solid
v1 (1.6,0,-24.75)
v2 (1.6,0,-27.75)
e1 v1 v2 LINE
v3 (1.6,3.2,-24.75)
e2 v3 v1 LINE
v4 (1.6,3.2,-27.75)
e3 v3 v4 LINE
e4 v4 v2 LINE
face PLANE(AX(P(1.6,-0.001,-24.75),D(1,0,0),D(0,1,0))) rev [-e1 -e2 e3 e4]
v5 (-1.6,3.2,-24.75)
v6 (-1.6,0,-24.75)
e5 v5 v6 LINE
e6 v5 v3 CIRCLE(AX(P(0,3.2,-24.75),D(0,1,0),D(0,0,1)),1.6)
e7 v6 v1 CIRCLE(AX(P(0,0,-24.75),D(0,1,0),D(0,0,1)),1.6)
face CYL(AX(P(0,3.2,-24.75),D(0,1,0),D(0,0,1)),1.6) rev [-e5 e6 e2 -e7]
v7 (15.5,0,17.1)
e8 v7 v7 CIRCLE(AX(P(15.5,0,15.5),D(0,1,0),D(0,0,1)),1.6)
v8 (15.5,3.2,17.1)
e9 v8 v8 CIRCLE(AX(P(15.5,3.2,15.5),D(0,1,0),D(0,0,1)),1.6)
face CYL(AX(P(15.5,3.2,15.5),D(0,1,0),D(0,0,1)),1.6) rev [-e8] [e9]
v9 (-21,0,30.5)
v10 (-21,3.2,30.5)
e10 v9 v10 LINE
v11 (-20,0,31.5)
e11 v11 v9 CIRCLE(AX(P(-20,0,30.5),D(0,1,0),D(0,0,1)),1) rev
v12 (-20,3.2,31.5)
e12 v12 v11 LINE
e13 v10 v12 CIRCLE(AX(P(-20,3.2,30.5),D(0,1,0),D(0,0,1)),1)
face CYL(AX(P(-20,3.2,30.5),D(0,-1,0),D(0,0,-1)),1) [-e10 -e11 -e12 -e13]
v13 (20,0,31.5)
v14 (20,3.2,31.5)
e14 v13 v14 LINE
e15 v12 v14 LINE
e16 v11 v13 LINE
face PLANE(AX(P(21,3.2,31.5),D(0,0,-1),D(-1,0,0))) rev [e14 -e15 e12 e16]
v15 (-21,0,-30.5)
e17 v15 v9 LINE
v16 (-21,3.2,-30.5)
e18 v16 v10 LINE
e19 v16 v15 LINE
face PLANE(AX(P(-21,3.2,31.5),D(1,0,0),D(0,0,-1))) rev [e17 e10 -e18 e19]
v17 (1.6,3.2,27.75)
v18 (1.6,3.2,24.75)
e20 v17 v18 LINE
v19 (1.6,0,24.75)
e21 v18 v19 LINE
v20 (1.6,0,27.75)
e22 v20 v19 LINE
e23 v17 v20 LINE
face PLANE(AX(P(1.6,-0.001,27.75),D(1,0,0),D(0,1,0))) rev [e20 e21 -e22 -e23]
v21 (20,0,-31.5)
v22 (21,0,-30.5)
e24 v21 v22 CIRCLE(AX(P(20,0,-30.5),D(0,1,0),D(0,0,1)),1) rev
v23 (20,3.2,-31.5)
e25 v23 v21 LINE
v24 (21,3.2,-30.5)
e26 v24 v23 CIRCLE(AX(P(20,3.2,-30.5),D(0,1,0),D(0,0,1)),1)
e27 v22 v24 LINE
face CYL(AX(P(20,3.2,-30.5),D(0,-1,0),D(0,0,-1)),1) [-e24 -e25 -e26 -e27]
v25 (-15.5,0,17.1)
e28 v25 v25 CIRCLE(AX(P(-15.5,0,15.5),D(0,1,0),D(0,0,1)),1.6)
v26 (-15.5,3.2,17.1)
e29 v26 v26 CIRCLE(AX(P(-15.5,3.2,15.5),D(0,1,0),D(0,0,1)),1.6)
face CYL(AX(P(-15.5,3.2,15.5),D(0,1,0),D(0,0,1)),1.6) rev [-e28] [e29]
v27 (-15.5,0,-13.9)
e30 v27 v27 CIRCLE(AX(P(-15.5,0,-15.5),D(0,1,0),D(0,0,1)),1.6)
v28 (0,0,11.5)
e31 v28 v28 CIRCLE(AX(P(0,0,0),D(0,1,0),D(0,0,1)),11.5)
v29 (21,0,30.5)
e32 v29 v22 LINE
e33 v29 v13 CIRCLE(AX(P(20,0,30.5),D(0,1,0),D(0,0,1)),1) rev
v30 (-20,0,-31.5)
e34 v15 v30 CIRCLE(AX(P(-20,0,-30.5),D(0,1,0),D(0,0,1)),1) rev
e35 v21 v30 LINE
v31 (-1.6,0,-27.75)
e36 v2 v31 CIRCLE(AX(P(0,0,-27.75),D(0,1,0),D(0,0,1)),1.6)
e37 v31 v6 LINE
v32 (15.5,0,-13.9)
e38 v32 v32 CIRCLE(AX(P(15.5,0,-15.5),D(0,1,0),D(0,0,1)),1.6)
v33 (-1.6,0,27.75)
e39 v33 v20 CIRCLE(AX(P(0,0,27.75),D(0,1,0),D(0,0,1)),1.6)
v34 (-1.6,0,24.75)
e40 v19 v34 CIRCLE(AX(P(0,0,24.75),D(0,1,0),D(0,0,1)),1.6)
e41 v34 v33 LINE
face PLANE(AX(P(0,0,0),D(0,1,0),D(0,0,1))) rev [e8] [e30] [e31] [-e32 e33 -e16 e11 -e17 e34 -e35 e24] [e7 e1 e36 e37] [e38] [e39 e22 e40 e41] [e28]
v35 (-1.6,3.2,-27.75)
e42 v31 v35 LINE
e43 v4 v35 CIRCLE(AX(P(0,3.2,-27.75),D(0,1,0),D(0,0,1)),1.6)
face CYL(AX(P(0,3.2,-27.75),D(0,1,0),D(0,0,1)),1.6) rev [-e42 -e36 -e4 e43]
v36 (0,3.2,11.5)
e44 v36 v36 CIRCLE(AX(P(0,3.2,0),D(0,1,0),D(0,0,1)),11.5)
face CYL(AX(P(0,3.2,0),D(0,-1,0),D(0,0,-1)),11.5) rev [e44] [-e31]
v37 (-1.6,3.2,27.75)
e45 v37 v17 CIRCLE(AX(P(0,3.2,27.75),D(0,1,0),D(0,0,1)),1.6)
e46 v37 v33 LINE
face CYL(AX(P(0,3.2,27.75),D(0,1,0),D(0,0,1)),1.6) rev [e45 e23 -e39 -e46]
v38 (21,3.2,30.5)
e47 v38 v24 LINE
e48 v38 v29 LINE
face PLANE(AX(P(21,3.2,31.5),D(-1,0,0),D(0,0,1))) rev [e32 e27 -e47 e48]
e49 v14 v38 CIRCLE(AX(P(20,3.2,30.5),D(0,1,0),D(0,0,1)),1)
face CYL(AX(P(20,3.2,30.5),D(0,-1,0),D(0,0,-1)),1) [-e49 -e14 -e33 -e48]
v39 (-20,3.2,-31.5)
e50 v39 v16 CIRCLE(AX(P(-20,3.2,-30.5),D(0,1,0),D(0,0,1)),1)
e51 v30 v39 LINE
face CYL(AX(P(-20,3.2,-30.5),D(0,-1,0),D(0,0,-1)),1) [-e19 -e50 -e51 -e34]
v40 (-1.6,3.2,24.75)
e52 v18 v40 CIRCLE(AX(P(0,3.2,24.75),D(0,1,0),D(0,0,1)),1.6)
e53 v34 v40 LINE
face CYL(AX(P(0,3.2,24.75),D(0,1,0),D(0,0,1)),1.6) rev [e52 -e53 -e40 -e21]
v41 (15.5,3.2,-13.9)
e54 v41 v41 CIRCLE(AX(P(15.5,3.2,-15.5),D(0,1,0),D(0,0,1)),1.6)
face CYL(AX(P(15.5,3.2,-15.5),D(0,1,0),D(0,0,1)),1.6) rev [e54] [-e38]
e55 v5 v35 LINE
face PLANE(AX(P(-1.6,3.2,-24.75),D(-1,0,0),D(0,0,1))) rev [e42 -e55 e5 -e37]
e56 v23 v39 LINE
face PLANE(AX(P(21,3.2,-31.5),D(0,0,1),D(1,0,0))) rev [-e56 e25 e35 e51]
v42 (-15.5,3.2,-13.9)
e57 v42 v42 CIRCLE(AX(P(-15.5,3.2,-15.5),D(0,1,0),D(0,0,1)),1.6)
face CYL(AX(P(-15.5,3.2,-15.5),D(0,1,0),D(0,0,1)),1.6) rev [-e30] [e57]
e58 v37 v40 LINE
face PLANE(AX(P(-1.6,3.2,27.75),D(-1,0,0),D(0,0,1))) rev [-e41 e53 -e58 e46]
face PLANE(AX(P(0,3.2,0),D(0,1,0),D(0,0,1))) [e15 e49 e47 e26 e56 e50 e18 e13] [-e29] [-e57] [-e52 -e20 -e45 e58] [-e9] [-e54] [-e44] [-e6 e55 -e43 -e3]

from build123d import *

# Parameters (mm, degrees)
SKETCH1_W                = 42
SKETCH1_H                = 63
SKETCH1_R                = 11.5
BOSS_EXTRUDE1_DEPTH      = 3.2
M3_CLEARANCE_HOLE1_D     = 3.2
M3_CLEARANCE_SLOT1_DEPTH = 3.2
FILLET1_R                = 1


# Read off the part's stored shape, not the designer's step: M3 Clearance Slot1
with BuildPart() as part:
    # Sketch1 → Boss-Extrude1 (new body)
    with BuildSketch(Plane(origin=(0, 0, 0), x_dir=(1, 0, 0), z_dir=(0, 1, 0))):
        Rectangle(SKETCH1_W, SKETCH1_H)
        with Locations(Location((0, 0, 0), (0, 0, 270))):
            Circle(SKETCH1_R, mode=Mode.SUBTRACT)
    extrude(amount=BOSS_EXTRUDE1_DEPTH)

    # M3 Clearance Hole1 (through all)
    with Locations(Plane(origin=(0, 3.2, 0), x_dir=(1, 0, 0), z_dir=(0, 1, 0))):
        with Locations((-15.5, 15.5), (15.5, 15.5), (15.5, -15.5), (-15.5, -15.5)):
            Hole(M3_CLEARANCE_HOLE1_D / 2)

    # M3 Clearance Slot1 outline → M3 Clearance Slot1 (cut)
    with BuildSketch(Plane(origin=(0, 0, 0), x_dir=(1, 0, 0), z_dir=(0, 1, 0))):
        with BuildLine():
            Line((1.6, -27.75), (1.6, -24.75))
            ThreePointArc((1.6, -24.75), (0, -23.15), (-1.6, -24.75))
            Line((-1.6, -24.75), (-1.6, -27.75))
            ThreePointArc((-1.6, -27.75), (0, -29.35), (1.6, -27.75))
        make_face()
        with BuildLine():
            ThreePointArc((1.6, 27.75), (0, 29.35), (-1.6, 27.75))
            Line((-1.6, 27.75), (-1.6, 24.75))
            ThreePointArc((-1.6, 24.75), (0, 23.15), (1.6, 24.75))
            Line((1.6, 24.75), (1.6, 27.75))
        make_face()
    extrude(amount=M3_CLEARANCE_SLOT1_DEPTH, mode=Mode.SUBTRACT)

    # Fillet1
    fillet1_edges = [part.edges().sort_by_distance(p)[0] for p in [
        (-21, 1.6, -31.5),
        (21, 1.6, -31.5),
        (21, 1.6, 31.5),
        (-21, 1.6, 31.5),
    ]]
    fillet(fillet1_edges, radius=FILLET1_R)


solid = part.part
